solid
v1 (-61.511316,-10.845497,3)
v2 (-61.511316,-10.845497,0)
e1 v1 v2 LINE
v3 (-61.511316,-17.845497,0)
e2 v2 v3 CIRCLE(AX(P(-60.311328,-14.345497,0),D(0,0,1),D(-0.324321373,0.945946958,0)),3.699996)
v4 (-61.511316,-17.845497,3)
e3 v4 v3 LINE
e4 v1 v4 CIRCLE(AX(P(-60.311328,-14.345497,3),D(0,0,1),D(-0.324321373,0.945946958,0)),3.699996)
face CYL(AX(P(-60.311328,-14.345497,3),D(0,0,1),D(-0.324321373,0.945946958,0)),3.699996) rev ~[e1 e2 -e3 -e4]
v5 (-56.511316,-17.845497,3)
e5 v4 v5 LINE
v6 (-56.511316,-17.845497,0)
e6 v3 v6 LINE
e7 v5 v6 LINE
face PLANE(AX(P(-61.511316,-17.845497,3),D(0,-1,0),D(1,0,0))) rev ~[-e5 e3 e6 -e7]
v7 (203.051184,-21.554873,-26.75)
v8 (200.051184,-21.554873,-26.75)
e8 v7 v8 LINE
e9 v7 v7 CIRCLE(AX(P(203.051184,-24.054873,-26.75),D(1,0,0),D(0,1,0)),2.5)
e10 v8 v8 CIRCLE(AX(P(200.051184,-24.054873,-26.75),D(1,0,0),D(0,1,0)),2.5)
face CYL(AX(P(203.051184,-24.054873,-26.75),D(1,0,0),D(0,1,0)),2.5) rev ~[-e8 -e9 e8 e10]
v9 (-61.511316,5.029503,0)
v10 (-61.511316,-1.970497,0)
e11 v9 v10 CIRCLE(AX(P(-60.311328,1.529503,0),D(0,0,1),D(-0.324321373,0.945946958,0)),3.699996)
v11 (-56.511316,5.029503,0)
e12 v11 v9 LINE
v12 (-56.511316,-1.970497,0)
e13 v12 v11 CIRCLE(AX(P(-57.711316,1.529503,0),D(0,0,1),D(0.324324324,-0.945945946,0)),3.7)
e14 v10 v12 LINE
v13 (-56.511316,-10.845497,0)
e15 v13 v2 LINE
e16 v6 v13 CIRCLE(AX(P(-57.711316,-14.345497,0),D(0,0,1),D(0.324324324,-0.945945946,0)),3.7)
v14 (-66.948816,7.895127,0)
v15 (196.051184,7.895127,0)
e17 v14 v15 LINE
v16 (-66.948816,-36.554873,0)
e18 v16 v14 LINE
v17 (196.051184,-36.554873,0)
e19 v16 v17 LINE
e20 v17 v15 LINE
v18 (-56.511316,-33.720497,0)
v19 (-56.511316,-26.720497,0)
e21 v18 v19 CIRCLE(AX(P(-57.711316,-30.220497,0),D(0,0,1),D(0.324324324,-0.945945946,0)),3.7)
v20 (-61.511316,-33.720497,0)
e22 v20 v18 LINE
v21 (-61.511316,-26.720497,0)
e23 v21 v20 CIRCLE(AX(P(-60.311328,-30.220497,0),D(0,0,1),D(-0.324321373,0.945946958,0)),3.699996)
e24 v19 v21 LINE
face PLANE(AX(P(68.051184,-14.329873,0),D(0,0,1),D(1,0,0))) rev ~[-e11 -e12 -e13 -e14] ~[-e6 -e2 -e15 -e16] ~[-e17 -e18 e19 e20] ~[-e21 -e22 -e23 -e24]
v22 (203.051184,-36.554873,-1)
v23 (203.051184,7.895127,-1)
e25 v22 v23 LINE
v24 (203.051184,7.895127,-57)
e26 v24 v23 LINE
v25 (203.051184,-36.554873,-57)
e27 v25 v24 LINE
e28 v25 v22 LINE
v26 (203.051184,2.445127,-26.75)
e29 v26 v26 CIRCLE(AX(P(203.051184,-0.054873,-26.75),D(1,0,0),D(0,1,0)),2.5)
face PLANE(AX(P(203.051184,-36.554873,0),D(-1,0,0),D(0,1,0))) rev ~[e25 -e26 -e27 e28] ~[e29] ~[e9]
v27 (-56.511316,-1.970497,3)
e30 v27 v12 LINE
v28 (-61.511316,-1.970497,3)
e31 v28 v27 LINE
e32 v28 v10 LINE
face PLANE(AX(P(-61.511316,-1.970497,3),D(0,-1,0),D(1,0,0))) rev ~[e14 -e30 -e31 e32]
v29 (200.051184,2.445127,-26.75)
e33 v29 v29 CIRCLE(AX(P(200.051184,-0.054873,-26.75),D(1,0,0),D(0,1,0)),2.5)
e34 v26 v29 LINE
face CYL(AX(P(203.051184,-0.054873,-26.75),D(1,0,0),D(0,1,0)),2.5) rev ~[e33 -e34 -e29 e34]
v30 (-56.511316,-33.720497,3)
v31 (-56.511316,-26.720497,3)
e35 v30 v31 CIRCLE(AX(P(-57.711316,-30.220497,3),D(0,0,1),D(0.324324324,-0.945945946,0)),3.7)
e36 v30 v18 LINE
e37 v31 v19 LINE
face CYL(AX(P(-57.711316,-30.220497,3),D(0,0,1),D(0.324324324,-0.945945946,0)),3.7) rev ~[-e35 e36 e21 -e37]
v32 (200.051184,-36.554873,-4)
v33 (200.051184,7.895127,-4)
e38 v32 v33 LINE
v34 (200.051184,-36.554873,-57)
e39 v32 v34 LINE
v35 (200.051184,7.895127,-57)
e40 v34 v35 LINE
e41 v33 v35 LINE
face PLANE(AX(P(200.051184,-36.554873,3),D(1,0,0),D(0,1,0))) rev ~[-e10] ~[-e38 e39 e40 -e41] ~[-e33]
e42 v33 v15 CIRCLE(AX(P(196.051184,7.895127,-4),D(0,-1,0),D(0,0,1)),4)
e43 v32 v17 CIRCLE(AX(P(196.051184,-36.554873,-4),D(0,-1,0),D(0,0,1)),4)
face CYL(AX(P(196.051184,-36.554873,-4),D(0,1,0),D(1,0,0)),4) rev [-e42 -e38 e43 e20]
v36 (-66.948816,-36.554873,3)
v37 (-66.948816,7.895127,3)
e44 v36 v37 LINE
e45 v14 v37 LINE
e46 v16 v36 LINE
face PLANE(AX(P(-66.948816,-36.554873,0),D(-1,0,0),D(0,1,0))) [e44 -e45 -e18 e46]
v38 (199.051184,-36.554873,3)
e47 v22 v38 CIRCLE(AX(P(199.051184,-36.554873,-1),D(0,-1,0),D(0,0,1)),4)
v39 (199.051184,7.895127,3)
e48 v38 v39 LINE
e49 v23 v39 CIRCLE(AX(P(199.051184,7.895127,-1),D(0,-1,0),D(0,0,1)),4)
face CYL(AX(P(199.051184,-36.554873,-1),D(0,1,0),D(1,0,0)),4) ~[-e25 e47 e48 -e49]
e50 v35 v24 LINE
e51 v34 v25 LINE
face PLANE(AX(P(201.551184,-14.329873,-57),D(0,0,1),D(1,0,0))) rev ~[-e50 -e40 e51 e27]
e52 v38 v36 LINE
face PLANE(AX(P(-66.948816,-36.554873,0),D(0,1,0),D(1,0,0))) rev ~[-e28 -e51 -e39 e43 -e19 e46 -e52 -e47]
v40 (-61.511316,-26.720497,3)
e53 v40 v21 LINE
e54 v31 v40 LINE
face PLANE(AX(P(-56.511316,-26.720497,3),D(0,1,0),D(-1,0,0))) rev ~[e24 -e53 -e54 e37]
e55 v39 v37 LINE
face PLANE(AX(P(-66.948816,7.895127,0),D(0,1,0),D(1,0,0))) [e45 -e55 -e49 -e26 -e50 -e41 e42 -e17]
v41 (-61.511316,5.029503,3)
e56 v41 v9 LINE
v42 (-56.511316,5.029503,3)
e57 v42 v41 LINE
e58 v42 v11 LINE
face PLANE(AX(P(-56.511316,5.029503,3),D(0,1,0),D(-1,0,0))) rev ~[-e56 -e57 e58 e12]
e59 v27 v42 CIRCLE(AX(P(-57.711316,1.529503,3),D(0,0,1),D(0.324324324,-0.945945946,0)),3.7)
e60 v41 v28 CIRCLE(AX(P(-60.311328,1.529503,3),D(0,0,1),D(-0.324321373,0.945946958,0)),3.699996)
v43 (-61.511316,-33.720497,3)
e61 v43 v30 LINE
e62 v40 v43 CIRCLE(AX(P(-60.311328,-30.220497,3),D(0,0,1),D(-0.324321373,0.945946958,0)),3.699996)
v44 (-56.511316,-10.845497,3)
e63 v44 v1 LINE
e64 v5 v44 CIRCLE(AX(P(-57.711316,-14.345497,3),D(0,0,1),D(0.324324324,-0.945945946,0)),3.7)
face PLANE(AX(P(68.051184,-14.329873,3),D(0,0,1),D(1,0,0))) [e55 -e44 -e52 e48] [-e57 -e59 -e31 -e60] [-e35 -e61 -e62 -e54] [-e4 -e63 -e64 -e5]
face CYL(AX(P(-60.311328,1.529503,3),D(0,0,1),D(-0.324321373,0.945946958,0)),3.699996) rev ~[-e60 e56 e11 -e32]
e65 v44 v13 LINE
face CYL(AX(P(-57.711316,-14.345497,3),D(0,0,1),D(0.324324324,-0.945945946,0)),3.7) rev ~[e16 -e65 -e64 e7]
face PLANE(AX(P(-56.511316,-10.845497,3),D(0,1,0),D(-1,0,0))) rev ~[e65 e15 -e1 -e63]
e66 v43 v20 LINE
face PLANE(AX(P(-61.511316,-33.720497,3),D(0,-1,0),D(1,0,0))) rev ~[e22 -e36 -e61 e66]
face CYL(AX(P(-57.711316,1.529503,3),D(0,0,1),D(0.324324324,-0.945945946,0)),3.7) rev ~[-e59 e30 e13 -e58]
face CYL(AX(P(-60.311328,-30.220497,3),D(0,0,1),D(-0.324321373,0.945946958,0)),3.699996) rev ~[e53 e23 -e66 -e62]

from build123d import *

# Parameters (mm, degrees)
F0_W     = 270
F0_H     = 44.45
F1_DEPTH = 3
F3_DEPTH = 3
F2_W     = 3
F2_H     = 44.45
F4_DEPTH = 60
F5_R     = 2.5
F6_DEPTH = 3
F7_R     = 4
F8_R     = 4


# Not quite as in the source:
# - a feature names something its author has since deleted; it is built from what else it names


with BuildPart() as f1:
    # F0 (on Top) → F1 (new body)
    with BuildSketch(Plane.XY):
        with Locations((68.0511838198, -14.3298729897)):
            Rectangle(F0_W, F0_H)
    extrude(amount=F1_DEPTH)

    # F2 (on face) → F3 (cut)
    with BuildSketch(Plane.XY.offset(3)):
        with BuildLine():
            Line((-56.5113161802, -26.720496912), (-59.0113161802, -26.720496912))
            Line((-59.0113161802, -26.720496912), (-61.5113161802, -26.720496912))
            ThreePointArc((-61.5113161802, -26.720496912), (-64.0113244271, -30.220496912), (-61.5113161802, -33.720496912))
            Line((-61.5113161802, -33.720496912), (-59.0113161802, -33.720496912))
            Line((-59.0113161802, -33.720496912), (-56.5113161802, -33.720496912))
            ThreePointArc((-56.5113161802, -33.720496912), (-54.0113161802, -30.220496912), (-56.5113161802, -26.720496912))
        make_face()
        with BuildLine():
            Line((-61.5113161802, -17.845496912), (-59.0113161802, -17.845496912))
            Line((-59.0113161802, -17.845496912), (-56.5113161802, -17.845496912))
            ThreePointArc((-56.5113161802, -17.845496912), (-54.0113161802, -14.345496912), (-56.5113161802, -10.845496912))
            Line((-56.5113161802, -10.845496912), (-59.0113161802, -10.845496912))
            Line((-59.0113161802, -10.845496912), (-61.5113161802, -10.845496912))
            ThreePointArc((-61.5113161802, -10.845496912), (-64.0113244271, -14.345496912), (-61.5113161802, -17.845496912))
        make_face()
        with BuildLine():
            Line((-61.5113161802, -1.970496912), (-59.0113161802, -1.970496912))
            Line((-59.0113161802, -1.970496912), (-56.5113161802, -1.970496912))
            ThreePointArc((-56.5113161802, -1.970496912), (-54.0113161802, 1.529503088), (-56.5113161802, 5.029503088))
            Line((-56.5113161802, 5.029503088), (-59.0113161802, 5.029503088))
            Line((-59.0113161802, 5.029503088), (-61.5113161802, 5.029503088))
            ThreePointArc((-61.5113161802, 5.029503088), (-64.0113244271, 1.529503088), (-61.5113161802, -1.970496912))
        make_face()
    extrude(amount=-F3_DEPTH, mode=Mode.SUBTRACT)

    # F2 (on face) → F4 (join)
    with BuildSketch(Plane.XY.offset(3)):
        with Locations((201.5511838198, -14.3298729897)):
            Rectangle(F2_W, F2_H)
    extrude(amount=-F4_DEPTH)

    # F5 (on face) → F6 (cut)
    with BuildSketch(Plane.YZ.offset(203.0511838198)):
        with Locations((-24.0548729897, -26.75)):
            Circle(F5_R)
        with Locations((-0.0548729897, -26.75)):
            Circle(F5_R)
    extrude(amount=-F6_DEPTH, mode=Mode.SUBTRACT)

    # F7
    f7_edges = [f1.edges().sort_by_distance(p)[0] for p in [
        (200.051184, -14.329873, 0),
    ]]
    fillet(f7_edges, radius=F7_R)

    # F8
    f8_edges = [f1.edges().sort_by_distance(p)[0] for p in [
        (203.051184, -14.329873, 3),
    ]]
    fillet(f8_edges, radius=F8_R)


solid = f1.part
